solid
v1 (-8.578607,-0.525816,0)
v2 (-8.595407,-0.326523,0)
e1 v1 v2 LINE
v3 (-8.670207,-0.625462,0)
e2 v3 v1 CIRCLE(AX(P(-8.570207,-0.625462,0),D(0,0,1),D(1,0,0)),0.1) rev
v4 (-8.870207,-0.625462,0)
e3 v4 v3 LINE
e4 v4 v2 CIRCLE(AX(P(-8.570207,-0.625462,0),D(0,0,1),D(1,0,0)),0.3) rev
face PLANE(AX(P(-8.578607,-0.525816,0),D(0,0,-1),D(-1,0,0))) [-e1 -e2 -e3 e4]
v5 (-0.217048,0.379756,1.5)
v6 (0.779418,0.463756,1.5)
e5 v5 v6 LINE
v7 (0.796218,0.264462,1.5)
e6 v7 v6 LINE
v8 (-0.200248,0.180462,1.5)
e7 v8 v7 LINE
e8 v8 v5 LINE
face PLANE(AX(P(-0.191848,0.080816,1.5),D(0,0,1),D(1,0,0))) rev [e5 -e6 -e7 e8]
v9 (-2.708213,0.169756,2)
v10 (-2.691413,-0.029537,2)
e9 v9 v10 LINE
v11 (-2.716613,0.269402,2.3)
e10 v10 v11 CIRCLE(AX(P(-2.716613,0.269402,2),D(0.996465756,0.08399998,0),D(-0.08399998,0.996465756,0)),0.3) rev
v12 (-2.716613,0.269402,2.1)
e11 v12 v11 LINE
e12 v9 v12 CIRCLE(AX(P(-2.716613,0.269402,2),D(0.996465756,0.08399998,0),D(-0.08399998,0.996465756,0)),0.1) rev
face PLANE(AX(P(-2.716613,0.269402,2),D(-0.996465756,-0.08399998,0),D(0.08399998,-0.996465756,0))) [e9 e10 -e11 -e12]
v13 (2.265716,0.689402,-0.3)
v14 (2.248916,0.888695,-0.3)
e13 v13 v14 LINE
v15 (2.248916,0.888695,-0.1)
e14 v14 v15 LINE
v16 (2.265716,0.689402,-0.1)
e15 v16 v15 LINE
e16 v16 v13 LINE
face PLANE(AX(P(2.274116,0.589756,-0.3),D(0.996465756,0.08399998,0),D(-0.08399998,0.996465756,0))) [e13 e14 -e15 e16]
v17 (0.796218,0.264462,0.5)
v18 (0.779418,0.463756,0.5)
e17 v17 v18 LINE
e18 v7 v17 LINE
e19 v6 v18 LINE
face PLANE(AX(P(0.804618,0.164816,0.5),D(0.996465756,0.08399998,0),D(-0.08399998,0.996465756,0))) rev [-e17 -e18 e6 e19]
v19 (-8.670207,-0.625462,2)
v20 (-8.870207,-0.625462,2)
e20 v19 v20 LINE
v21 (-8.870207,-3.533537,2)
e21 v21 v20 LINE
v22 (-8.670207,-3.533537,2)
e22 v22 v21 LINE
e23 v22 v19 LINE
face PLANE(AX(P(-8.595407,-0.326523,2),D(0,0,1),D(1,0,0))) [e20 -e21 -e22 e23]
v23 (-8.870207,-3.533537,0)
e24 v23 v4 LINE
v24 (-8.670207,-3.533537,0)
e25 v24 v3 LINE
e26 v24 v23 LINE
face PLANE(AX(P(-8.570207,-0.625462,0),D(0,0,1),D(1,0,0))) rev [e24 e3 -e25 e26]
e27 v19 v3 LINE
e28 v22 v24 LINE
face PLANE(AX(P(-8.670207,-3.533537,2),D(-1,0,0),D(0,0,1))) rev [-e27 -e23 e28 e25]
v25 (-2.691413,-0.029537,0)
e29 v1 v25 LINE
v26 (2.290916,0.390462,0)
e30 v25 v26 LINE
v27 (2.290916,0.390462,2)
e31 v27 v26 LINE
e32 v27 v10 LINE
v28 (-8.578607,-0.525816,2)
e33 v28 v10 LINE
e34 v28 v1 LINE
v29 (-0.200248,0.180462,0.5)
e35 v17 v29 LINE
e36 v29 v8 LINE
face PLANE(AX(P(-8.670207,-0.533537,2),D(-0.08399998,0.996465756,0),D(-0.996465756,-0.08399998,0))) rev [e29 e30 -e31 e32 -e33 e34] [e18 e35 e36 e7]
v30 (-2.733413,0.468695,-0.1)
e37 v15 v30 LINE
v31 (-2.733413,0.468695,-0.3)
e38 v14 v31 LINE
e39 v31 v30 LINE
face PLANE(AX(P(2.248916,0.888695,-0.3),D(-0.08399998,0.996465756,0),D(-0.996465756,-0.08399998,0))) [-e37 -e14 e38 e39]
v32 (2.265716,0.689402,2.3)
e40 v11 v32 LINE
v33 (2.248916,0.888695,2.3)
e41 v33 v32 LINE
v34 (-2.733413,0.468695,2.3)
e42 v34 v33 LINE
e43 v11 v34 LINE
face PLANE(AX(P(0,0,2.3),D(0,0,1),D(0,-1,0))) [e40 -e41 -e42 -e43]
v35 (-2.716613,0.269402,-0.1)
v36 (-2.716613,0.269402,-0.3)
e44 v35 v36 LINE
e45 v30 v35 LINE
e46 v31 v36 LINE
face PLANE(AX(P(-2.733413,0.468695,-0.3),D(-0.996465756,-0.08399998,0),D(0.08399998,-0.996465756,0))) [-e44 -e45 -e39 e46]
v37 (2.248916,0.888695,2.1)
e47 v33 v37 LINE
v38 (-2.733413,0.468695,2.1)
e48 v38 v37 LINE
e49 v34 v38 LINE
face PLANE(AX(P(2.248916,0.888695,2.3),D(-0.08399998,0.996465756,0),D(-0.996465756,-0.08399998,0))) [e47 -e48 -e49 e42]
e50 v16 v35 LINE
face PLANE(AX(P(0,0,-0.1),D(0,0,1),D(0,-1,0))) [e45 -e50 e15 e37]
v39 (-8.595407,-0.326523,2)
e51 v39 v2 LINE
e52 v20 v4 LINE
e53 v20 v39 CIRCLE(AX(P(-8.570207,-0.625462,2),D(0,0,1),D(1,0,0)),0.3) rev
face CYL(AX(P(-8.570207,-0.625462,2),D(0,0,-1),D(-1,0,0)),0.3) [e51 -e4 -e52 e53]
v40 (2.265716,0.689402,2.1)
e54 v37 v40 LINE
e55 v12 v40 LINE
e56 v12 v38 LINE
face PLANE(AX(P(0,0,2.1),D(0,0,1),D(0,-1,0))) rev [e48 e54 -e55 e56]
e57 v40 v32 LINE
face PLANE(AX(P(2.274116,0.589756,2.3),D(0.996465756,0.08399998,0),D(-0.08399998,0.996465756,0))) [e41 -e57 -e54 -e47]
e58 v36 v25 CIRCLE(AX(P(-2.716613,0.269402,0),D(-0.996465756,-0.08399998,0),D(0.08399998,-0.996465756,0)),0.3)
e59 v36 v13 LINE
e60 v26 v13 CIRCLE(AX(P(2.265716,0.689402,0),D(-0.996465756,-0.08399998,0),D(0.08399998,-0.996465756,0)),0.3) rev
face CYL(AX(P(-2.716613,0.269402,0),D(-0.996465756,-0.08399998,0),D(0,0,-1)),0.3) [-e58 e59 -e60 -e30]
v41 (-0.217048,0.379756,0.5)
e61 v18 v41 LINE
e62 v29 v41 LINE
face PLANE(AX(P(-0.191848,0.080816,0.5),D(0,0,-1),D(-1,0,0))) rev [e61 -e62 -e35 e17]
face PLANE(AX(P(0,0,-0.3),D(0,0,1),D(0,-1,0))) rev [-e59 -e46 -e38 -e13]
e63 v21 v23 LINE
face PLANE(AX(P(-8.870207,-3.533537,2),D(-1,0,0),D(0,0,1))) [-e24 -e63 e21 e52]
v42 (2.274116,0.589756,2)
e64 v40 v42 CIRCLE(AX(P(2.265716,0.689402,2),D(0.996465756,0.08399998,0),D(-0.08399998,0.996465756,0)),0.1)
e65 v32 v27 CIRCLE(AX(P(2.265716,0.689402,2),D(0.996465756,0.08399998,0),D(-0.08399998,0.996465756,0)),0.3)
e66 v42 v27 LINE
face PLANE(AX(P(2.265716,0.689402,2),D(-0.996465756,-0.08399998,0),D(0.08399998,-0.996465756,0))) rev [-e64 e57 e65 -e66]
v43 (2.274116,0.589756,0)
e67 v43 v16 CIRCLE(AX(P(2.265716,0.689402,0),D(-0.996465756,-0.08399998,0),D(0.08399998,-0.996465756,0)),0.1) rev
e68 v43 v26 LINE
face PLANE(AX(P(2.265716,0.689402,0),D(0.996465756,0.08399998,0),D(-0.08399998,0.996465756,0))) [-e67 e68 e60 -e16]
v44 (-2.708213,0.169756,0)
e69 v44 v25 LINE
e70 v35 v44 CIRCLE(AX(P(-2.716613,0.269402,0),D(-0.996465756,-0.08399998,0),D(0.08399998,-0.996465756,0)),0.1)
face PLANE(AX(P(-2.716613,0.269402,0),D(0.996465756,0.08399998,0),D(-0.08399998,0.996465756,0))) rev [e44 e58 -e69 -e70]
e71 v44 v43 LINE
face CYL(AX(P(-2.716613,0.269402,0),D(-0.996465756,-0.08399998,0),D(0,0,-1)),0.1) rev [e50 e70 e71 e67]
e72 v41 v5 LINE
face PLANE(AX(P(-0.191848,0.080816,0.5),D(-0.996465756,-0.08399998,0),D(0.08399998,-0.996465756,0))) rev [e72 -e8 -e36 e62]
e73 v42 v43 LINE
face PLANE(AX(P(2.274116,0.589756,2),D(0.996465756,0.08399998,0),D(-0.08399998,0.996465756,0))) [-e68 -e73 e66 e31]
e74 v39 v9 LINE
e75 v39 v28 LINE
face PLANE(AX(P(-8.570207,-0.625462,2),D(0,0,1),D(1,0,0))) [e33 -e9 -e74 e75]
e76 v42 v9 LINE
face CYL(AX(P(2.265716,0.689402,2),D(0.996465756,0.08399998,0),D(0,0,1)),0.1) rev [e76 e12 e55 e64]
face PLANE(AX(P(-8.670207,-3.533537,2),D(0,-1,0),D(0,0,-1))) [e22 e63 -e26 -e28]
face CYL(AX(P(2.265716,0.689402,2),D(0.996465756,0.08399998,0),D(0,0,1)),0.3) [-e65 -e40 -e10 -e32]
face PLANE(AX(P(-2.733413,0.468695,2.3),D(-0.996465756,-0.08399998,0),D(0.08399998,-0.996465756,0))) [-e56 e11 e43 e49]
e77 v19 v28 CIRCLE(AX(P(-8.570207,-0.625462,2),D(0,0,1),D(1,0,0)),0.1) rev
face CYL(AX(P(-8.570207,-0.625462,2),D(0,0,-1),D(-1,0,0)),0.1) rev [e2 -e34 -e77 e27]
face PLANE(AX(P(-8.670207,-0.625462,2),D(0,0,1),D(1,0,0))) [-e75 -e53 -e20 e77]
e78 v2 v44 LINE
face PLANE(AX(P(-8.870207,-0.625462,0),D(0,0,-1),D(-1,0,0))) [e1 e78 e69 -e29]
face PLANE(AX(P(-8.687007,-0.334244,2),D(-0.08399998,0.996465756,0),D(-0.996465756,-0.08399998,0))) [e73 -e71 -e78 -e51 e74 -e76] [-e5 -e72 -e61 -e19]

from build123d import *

# Parameters (mm, degrees)
SM_BASE_FLANGE_1_DEPTH      = 2
SM_EDGE_FLANGE_1_DEPTH      = 5
SM_EDGE_FLANGE_1_BEND_DEPTH = 5
SKETCH_16_W                 = 1
SKETCH_16_H                 = 1
CUT_EXTRUDE_3_DEPTH         = 0.3


# Sheet-metal steps are written as plain solids
with BuildPart() as part:
    # Эскиз5 → Базовая кромка1 (new body)
    with BuildSketch(Plane.XY):
        with BuildLine():
            Line((-8.670207128, -3.533537369), (-8.670207128, -0.625462256))
            ThreePointArc((-8.670207128, -0.625462256), (-8.643827777, -0.557786558), (-8.578607126, -0.52581568))
            Line((-8.578607126, -0.52581568), (2.29091619, 0.390462415))
            Line((2.29091619, 0.390462415), (2.274116194, 0.589755566))
            Line((2.274116194, 0.589755566), (-8.595407122, -0.326522529))
            ThreePointArc((-8.595407122, -0.326522529), (-8.791069074, -0.422435162), (-8.870207128, -0.625462256))
            Line((-8.870207128, -0.625462256), (-8.870207128, -3.533537369))
            Line((-8.870207128, -3.533537369), (-8.670207128, -3.533537369))
        make_face()
    extrude(amount=SM_BASE_FLANGE_1_DEPTH)

    # Ребро-кромка1 section (across the edge) → Ребро-кромка1 (add)
    with BuildSketch(Plane(origin=(-2.708212587, 0.169755664, 2.1), x_dir=(0, 0, -1), z_dir=(0.9964657562113037, 0.08399998034663243, 0))):
        with BuildLine():
            Line((-0.2, 0.1), (-0.2, 0.3))
            Line((-0.2, 0.3), (0, 0.3))
            Line((0, 0.3), (0, 0.1))
            ThreePointArc((0, 0.1), (0.029289322, 0.029289322), (0.1, 0))
            Line((0.1, 0), (0.1, -0.2))
            ThreePointArc((0.1, -0.2), (-0.112132034, -0.112132034), (-0.2, 0.1))
        make_face()
    extrude(amount=SM_EDGE_FLANGE_1_DEPTH)

    # Ребро-кромка1 section 2 (across the edge) → Ребро-кромка1 bend (add)
    with BuildSketch(Plane(origin=(2.274116194, 0.589755566, -0.1), x_dir=(0, 0, 1), z_dir=(-0.9964657562113037, -0.08399998034663243, 0))):
        with BuildLine():
            Line((-0.2, 0.1), (-0.2, 0.3))
            Line((-0.2, 0.3), (0, 0.3))
            Line((0, 0.3), (0, 0.1))
            ThreePointArc((0, 0.1), (0.029289322, 0.029289322), (0.1, 0))
            Line((0.1, 0), (0.1, -0.2))
            ThreePointArc((0.1, -0.2), (-0.112132034, -0.112132034), (-0.2, 0.1))
        make_face()
    extrude(amount=SM_EDGE_FLANGE_1_BEND_DEPTH)

    # Эскиз16 → Вырез-Вытянуть3 (cut)
    with BuildSketch(Plane(origin=(-0.033318215, 0.395243668, 0), x_dir=(0.9964657562113037, 0.08399998034663245, 0), z_dir=(-0.08399998034663245, 0.9964657562113038, 0))):
        with Locations((0.315618369, -1)):
            Rectangle(SKETCH_16_W, SKETCH_16_H)
    extrude(amount=-CUT_EXTRUDE_3_DEPTH, mode=Mode.SUBTRACT)


solid = part.part
